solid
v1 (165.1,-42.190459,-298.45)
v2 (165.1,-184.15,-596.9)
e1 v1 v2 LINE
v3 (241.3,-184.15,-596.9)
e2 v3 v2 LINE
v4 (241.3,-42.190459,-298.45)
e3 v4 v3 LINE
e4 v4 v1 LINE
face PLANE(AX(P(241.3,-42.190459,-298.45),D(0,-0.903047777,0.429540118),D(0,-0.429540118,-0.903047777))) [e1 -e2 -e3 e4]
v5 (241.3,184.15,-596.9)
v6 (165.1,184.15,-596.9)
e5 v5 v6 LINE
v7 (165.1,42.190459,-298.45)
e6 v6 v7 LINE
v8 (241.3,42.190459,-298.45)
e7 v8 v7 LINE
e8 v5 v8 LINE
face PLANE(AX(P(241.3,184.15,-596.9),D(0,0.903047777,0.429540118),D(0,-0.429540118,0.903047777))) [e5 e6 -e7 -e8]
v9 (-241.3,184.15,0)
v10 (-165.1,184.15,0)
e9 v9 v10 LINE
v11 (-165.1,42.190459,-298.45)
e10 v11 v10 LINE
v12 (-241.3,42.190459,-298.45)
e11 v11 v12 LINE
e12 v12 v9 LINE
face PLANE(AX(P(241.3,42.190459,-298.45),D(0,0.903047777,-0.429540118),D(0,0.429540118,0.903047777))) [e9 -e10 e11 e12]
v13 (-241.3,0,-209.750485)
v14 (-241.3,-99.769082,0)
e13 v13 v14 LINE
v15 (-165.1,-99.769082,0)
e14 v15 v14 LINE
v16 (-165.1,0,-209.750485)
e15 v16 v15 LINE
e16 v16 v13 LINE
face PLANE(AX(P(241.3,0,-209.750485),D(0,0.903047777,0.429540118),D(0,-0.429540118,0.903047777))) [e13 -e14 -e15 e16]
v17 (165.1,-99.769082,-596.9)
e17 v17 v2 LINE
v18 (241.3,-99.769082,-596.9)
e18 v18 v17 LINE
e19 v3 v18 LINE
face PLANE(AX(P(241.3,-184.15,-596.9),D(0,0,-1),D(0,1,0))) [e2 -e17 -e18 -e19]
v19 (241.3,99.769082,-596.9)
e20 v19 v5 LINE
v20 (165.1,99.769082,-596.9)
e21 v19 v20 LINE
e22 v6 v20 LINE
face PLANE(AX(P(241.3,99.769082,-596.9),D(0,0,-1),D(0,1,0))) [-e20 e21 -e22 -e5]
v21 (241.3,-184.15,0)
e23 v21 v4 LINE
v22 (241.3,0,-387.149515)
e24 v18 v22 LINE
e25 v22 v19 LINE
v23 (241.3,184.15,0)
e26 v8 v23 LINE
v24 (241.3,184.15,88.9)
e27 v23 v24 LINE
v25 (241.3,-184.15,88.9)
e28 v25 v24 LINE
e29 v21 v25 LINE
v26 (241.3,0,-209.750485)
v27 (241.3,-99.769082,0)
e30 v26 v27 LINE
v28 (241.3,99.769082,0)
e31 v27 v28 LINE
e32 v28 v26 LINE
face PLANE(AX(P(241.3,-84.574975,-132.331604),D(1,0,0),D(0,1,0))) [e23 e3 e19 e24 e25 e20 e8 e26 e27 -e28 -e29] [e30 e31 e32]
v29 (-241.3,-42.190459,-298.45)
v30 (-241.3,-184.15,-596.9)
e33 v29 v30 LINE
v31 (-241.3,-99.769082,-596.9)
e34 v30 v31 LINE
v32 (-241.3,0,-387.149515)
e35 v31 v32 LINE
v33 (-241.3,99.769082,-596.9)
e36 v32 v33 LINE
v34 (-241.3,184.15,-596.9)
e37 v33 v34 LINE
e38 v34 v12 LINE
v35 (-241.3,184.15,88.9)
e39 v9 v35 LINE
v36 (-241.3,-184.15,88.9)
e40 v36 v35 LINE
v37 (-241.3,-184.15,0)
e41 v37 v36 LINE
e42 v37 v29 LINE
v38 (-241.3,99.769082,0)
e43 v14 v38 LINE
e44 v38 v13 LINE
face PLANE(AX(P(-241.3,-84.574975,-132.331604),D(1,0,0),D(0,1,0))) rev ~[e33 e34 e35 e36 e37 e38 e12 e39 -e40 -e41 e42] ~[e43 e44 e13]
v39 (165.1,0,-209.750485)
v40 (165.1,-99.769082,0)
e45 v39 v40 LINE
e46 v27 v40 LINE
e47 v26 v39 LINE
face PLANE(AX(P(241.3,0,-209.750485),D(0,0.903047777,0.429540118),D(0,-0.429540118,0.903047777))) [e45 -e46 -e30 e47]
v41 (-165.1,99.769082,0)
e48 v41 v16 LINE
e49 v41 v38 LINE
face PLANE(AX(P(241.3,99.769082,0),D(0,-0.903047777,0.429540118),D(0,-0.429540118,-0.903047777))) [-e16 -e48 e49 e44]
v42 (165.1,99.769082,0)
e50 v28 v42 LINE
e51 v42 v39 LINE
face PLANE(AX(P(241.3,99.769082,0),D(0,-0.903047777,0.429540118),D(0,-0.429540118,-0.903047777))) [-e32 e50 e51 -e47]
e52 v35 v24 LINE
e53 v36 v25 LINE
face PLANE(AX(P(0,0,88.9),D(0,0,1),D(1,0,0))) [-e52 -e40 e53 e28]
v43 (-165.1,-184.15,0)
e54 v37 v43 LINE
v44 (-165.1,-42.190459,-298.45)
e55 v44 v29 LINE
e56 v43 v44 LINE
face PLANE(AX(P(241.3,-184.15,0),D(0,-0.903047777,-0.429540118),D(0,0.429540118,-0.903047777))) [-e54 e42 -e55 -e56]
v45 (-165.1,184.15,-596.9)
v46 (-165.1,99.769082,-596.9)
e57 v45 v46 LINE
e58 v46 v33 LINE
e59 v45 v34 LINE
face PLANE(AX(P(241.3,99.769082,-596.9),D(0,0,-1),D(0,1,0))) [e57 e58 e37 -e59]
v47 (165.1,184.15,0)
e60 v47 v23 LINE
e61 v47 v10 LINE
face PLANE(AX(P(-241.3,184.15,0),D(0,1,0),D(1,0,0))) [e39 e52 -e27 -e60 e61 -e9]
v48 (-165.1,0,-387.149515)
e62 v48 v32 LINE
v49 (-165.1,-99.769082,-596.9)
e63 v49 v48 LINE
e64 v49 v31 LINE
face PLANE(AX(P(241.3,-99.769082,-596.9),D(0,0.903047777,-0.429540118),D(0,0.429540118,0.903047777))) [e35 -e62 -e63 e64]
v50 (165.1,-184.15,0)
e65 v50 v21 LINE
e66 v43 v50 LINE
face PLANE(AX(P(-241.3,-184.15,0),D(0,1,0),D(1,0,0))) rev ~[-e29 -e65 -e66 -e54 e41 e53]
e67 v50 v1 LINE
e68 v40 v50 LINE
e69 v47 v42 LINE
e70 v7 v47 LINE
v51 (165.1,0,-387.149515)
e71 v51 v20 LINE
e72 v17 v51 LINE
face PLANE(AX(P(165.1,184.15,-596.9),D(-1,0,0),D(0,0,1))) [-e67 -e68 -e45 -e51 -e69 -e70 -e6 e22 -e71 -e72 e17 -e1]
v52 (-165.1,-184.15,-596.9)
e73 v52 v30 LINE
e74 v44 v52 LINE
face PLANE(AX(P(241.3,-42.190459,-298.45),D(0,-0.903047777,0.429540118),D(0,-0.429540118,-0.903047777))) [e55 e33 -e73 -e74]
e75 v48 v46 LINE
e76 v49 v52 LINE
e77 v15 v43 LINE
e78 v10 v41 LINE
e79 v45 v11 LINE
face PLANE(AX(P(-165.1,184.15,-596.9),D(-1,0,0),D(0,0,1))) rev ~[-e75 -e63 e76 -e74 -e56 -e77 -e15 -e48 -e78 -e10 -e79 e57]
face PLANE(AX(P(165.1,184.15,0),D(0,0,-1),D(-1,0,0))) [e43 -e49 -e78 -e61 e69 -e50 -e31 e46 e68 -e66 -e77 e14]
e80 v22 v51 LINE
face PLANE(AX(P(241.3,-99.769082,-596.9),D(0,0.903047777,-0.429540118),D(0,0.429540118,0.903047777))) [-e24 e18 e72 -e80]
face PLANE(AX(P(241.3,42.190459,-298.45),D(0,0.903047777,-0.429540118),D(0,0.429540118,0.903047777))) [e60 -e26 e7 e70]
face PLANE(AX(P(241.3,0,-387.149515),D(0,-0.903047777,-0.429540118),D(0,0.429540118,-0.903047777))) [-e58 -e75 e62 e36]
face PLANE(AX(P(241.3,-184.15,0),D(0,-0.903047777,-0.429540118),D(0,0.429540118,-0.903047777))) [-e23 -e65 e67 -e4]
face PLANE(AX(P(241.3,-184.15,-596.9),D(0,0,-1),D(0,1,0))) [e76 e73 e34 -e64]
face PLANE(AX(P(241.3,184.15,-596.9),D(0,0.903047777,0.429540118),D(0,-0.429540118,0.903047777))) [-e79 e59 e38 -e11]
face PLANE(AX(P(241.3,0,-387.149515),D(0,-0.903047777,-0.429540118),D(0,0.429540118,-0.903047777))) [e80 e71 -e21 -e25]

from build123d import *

# Parameters (mm, degrees)
F0_W     = 482.6
F0_H     = 368.3
F1_DEPTH = 88.9
F3_DEPTH = 482.6
F4_W     = 330.2
F4_H     = 596.9
F5_DEPTH = 368.301


with BuildPart() as f1:
    # F0 (on Top) → F1 (new body)
    with BuildSketch(Plane.XY):
        Rectangle(F0_W, F0_H)
    extrude(amount=F1_DEPTH)

    # F2 (on face) → F3 (join)
    with BuildSketch(Plane.YZ.offset(241.3)):
        Polygon((-99.7690824552, 0), (-184.15, 0), (-42.1904587724, -298.45), (0, -209.7504852528), align=None)
        Polygon((99.7690824552, 0), (0, -209.7504852528), (42.1904587724, -298.45), (184.15, 0), align=None)
        Polygon((0, -209.7504852528), (-42.1904587724, -298.45), (0, -387.1495147472), (42.1904587724, -298.45), align=None)
        Polygon((42.1904587724, -298.45), (0, -387.1495147472), (99.7690824552, -596.9), (184.15, -596.9), align=None)
        Polygon((0, -387.1495147472), (-42.1904587724, -298.45), (-184.15, -596.9), (-99.7690824552, -596.9), align=None)
    extrude(amount=-F3_DEPTH)

    # F4 (on face) → F5 (cut, through all)
    with BuildSketch(Plane(origin=(0, 184.15, 0), x_dir=(-1, 0, 0), z_dir=(0, 1, 0))):
        with Locations((0, -298.45)):
            Rectangle(F4_W, F4_H)
    extrude(amount=-F5_DEPTH, mode=Mode.SUBTRACT)


solid = f1.part
